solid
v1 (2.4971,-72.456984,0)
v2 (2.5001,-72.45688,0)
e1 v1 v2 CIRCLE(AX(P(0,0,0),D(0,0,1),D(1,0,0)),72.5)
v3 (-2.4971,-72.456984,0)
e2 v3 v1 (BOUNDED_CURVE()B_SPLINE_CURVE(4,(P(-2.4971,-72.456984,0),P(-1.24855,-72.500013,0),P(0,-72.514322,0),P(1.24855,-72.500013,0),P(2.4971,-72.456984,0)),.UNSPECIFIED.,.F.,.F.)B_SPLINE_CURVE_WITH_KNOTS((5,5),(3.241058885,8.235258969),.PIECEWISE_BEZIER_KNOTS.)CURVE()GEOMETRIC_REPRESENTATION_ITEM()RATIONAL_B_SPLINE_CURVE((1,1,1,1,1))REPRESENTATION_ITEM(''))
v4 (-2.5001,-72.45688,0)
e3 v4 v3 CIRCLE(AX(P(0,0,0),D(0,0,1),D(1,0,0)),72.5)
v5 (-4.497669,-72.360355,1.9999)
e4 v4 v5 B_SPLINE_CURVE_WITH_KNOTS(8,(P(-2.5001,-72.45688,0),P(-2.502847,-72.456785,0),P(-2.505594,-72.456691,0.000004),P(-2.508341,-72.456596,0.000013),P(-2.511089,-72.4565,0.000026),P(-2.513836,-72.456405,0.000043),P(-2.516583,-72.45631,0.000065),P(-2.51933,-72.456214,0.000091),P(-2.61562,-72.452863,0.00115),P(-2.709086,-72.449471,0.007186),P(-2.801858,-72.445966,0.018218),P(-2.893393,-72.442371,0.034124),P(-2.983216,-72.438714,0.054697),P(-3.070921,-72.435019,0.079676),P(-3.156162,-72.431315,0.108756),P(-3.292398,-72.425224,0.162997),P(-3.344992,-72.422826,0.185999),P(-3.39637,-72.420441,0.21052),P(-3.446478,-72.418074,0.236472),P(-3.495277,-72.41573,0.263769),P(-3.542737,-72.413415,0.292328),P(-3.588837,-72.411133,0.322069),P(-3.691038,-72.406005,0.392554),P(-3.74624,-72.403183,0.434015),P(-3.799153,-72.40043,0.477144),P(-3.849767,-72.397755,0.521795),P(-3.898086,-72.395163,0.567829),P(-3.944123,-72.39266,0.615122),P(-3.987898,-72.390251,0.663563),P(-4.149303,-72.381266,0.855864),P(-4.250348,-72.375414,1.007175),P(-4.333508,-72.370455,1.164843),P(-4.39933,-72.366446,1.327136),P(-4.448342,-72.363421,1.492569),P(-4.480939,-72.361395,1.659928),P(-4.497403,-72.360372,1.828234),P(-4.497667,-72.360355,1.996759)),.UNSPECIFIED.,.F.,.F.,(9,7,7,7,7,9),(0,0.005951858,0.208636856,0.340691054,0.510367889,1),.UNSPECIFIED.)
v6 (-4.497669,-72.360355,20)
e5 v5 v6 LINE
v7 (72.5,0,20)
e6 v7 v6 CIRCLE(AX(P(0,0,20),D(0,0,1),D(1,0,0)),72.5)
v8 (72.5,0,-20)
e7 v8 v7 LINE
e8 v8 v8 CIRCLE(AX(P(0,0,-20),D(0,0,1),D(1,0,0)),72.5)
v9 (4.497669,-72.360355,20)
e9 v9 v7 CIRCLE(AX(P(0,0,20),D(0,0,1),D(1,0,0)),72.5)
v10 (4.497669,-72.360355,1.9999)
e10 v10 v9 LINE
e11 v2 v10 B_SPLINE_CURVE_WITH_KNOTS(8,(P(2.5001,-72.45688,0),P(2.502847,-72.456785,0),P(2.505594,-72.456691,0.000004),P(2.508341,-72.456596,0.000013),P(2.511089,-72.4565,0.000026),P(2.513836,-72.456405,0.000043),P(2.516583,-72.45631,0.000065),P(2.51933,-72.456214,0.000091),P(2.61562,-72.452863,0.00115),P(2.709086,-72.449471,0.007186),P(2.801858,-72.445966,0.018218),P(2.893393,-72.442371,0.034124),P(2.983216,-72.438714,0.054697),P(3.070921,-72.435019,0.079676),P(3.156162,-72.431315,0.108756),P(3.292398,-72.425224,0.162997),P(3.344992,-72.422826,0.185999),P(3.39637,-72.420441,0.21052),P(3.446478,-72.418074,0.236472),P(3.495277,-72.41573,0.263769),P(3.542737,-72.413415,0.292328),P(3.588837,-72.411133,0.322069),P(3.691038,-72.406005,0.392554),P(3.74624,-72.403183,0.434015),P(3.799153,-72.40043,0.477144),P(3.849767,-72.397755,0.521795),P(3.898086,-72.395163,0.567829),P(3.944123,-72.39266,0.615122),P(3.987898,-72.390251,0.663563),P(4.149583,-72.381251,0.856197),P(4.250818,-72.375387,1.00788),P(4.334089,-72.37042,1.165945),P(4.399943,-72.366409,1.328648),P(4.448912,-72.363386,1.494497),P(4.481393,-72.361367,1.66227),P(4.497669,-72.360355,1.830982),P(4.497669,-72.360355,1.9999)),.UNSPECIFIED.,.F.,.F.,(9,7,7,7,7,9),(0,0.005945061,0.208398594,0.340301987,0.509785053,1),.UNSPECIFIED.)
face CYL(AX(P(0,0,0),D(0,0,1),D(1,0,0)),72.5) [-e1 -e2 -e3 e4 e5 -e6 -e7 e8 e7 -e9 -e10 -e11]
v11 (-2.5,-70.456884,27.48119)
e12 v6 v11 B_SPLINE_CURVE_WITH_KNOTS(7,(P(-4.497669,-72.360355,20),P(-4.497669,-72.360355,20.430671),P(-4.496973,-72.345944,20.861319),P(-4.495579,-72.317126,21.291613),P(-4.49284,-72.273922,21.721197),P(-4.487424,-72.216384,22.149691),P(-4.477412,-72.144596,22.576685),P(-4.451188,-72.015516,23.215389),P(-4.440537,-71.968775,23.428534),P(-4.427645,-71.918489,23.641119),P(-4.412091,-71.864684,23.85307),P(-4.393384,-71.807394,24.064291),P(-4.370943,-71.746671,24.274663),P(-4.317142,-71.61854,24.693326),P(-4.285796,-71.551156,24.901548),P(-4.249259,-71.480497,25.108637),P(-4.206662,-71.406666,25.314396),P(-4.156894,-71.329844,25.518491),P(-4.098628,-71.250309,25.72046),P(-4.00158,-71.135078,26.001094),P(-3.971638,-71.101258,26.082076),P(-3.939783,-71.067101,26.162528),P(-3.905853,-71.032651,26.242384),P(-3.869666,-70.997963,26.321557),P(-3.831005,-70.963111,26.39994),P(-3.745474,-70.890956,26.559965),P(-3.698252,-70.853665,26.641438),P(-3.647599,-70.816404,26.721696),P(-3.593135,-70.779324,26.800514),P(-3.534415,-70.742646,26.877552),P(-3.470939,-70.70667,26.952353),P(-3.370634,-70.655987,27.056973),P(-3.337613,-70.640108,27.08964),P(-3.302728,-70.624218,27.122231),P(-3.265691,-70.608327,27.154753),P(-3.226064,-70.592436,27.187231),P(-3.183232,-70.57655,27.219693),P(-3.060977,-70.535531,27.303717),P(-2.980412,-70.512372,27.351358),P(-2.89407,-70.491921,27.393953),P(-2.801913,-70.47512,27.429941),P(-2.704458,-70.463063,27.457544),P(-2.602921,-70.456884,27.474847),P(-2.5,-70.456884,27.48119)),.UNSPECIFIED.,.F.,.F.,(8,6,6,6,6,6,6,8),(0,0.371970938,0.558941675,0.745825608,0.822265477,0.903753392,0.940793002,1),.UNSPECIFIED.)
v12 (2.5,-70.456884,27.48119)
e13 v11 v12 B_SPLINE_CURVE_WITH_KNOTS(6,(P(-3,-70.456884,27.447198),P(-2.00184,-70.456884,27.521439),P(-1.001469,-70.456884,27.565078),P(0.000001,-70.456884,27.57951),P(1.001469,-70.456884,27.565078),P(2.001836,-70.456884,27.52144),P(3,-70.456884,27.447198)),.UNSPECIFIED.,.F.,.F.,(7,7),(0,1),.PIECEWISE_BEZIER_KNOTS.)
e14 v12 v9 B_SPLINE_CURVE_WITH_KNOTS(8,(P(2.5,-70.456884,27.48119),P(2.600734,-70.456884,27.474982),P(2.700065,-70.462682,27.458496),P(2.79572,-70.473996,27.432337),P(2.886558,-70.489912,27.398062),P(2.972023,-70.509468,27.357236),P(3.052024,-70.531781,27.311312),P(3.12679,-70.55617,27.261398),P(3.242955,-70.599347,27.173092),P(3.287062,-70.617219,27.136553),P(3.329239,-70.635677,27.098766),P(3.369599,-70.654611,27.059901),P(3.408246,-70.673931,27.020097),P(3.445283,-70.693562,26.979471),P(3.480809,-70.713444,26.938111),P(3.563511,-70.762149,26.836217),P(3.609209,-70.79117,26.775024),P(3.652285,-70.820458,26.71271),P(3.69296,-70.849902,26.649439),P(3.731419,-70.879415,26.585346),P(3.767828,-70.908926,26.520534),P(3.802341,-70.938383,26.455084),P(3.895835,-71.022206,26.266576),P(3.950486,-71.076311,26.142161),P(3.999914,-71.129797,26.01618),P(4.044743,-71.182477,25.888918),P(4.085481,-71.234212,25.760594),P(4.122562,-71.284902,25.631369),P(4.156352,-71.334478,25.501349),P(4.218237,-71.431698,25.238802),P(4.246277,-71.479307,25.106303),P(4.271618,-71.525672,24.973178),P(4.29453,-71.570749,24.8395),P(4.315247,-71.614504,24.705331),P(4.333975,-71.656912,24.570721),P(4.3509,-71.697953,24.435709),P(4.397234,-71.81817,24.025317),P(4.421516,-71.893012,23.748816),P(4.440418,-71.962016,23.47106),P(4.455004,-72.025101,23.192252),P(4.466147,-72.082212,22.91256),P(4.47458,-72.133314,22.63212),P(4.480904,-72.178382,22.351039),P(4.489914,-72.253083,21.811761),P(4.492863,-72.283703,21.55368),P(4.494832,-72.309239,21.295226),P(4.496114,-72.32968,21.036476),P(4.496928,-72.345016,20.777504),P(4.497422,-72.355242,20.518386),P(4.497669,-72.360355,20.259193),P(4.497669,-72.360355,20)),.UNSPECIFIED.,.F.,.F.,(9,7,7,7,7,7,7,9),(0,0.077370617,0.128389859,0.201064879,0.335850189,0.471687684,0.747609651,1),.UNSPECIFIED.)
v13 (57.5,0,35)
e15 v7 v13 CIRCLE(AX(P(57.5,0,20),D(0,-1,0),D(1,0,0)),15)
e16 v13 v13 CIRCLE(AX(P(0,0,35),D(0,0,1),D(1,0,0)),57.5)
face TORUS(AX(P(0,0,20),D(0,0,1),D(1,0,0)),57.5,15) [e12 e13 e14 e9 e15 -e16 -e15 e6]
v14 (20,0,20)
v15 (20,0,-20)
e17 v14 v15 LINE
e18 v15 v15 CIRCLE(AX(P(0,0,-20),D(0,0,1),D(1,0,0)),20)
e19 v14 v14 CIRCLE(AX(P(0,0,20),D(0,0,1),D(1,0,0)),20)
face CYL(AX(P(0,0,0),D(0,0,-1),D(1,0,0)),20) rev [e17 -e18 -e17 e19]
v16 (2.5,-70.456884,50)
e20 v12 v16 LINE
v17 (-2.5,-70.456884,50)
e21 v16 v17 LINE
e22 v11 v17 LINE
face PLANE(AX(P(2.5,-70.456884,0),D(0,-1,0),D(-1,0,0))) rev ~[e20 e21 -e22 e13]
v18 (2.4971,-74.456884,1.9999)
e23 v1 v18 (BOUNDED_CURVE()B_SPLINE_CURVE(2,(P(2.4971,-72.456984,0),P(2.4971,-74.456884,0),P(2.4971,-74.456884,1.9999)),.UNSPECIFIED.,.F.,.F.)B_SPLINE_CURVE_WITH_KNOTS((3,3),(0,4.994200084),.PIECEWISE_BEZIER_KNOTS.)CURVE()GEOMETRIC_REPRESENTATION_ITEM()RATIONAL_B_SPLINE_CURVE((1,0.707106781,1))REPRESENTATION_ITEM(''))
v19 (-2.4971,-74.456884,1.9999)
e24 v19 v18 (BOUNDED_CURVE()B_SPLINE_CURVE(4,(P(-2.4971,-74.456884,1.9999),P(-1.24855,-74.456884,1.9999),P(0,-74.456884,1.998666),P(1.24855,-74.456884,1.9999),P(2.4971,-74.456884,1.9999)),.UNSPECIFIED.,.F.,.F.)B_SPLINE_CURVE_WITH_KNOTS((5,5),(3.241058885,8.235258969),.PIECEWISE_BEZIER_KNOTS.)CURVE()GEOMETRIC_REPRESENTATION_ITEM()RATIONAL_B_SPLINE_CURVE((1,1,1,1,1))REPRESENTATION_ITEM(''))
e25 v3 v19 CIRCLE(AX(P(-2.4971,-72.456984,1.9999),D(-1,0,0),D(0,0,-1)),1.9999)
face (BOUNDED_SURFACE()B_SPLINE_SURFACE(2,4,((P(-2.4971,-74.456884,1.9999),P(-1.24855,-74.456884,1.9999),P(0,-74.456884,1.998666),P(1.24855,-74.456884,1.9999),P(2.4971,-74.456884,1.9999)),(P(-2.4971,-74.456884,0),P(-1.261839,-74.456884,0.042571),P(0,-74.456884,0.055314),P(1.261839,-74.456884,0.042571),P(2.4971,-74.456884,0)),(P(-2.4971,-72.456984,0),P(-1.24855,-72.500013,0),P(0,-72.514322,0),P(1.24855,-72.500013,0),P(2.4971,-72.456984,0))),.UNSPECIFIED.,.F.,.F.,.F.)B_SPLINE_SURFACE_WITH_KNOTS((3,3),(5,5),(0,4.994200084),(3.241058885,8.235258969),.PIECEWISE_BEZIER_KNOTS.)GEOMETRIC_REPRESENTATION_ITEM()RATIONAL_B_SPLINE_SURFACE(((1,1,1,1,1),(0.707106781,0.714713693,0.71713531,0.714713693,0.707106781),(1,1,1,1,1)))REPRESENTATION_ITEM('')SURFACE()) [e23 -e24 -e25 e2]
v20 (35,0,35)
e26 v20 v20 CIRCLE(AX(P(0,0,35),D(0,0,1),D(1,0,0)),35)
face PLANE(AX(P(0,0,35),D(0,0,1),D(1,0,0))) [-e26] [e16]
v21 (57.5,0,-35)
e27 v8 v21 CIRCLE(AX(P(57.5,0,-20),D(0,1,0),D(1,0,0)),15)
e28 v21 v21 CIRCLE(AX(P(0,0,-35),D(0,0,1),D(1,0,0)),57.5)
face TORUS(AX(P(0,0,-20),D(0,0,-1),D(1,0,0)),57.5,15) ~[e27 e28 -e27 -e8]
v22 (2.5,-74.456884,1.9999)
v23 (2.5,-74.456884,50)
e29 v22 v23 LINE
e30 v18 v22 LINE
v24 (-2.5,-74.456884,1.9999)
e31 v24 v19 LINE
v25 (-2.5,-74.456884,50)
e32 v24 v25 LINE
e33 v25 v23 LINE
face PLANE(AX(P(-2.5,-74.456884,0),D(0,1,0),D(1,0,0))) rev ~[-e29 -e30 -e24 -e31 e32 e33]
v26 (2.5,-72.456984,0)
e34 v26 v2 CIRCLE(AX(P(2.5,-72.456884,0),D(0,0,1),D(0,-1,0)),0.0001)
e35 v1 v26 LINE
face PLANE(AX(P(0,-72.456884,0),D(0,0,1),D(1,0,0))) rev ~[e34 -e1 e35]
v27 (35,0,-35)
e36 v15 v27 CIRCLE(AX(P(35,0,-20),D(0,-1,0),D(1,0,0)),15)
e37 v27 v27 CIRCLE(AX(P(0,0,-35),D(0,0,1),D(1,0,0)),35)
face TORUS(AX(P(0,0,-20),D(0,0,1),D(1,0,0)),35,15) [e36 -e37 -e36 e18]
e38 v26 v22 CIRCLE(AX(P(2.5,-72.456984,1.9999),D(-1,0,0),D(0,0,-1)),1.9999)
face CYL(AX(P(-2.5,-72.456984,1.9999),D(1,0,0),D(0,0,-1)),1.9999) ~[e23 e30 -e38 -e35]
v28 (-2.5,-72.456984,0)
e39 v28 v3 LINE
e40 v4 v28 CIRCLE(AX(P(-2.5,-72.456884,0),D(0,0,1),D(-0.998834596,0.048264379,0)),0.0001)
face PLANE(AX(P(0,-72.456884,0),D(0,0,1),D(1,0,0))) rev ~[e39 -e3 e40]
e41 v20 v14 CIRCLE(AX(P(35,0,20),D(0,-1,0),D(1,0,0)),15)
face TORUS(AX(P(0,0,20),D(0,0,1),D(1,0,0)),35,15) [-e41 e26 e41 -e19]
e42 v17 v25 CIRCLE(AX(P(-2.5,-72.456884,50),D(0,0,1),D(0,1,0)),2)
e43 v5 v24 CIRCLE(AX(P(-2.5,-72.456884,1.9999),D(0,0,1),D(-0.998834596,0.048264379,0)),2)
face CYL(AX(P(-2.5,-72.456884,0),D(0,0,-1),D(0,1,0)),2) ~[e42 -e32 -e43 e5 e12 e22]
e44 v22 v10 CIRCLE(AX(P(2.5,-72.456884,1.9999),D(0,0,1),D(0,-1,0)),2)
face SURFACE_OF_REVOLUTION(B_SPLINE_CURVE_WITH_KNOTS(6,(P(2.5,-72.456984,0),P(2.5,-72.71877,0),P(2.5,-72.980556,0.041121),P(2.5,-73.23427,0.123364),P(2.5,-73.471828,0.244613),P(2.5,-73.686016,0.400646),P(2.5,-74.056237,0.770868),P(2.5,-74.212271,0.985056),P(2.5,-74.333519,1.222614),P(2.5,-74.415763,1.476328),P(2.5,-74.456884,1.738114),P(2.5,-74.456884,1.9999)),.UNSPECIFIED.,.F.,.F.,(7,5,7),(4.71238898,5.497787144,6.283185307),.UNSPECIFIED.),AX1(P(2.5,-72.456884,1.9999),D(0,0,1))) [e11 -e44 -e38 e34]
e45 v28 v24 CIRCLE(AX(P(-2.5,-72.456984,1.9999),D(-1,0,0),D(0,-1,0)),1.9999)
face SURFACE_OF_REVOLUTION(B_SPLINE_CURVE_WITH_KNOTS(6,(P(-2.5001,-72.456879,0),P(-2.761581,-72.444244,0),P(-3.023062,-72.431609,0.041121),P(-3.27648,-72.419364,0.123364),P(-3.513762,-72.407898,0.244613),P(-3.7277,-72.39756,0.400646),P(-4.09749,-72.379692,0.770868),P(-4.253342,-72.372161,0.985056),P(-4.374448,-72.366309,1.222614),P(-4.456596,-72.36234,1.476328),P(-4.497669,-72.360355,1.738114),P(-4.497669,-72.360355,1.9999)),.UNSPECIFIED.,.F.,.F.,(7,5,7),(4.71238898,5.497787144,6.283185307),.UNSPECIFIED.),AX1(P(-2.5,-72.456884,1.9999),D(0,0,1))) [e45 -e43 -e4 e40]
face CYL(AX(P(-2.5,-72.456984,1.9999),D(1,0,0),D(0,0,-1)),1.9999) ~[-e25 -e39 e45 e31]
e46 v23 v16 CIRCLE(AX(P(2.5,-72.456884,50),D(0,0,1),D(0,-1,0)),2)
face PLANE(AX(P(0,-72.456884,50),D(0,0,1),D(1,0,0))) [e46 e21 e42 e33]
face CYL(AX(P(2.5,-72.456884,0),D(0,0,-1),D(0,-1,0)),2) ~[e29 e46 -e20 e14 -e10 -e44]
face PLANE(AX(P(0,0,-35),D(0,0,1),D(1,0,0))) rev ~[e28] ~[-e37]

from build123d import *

# Parameters (mm, degrees)
F0_R     = 72.5
F0_R_2   = 20
F1_DEPTH = 35
F2_R     = 15
F4_DEPTH = 50
F5_R     = 1.9999


# Not quite as in the source:
# - a fillet or chamfer is up to 0.001 mm smaller than in the source, because OpenCascade refuses the exact size


with BuildPart() as f1:
    # F0 (on Top) → F1 (new body, symmetric)
    with BuildSketch(Plane.XY):
        Circle(F0_R)
        Circle(F0_R_2, mode=Mode.SUBTRACT)
    extrude(amount=F1_DEPTH, both=True)

    # F2
    f2_edges = [f1.edges().sort_by_distance(p)[0] for p in [
        (-20, 0, 35),
        (20, 0, 0),
        (-20, 0, -35),
        (-72.5, 0, -35),
        (72.5, 0, 0),
        (-72.5, 0, 35),
    ]]
    fillet(f2_edges, radius=F2_R)

    # F3 (on Top) → F4 (join)
    with BuildSketch(Plane.XY):
        with BuildLine():
            Line((2.5, -70.4568837309), (-2.5, -70.4568837309))
            ThreePointArc((-2.5, -70.4568837309), (-4.5, -72.4568837309), (-2.5, -74.4568837309))
            Line((-2.5, -74.4568837309), (2.5, -74.4568837309))
            ThreePointArc((2.5, -74.4568837309), (4.5, -72.4568837309), (2.5, -70.4568837309))
        make_face()
    extrude(amount=F4_DEPTH)

    # F5 (radius 2 in the source; OpenCascade refuses exactly that, so slightly less here)
    f5_edges = [f1.edges().sort_by_distance(p)[0] for p in [
        (0, -74.456884, 0),
    ]]
    fillet(f5_edges, radius=F5_R)


solid = f1.part
